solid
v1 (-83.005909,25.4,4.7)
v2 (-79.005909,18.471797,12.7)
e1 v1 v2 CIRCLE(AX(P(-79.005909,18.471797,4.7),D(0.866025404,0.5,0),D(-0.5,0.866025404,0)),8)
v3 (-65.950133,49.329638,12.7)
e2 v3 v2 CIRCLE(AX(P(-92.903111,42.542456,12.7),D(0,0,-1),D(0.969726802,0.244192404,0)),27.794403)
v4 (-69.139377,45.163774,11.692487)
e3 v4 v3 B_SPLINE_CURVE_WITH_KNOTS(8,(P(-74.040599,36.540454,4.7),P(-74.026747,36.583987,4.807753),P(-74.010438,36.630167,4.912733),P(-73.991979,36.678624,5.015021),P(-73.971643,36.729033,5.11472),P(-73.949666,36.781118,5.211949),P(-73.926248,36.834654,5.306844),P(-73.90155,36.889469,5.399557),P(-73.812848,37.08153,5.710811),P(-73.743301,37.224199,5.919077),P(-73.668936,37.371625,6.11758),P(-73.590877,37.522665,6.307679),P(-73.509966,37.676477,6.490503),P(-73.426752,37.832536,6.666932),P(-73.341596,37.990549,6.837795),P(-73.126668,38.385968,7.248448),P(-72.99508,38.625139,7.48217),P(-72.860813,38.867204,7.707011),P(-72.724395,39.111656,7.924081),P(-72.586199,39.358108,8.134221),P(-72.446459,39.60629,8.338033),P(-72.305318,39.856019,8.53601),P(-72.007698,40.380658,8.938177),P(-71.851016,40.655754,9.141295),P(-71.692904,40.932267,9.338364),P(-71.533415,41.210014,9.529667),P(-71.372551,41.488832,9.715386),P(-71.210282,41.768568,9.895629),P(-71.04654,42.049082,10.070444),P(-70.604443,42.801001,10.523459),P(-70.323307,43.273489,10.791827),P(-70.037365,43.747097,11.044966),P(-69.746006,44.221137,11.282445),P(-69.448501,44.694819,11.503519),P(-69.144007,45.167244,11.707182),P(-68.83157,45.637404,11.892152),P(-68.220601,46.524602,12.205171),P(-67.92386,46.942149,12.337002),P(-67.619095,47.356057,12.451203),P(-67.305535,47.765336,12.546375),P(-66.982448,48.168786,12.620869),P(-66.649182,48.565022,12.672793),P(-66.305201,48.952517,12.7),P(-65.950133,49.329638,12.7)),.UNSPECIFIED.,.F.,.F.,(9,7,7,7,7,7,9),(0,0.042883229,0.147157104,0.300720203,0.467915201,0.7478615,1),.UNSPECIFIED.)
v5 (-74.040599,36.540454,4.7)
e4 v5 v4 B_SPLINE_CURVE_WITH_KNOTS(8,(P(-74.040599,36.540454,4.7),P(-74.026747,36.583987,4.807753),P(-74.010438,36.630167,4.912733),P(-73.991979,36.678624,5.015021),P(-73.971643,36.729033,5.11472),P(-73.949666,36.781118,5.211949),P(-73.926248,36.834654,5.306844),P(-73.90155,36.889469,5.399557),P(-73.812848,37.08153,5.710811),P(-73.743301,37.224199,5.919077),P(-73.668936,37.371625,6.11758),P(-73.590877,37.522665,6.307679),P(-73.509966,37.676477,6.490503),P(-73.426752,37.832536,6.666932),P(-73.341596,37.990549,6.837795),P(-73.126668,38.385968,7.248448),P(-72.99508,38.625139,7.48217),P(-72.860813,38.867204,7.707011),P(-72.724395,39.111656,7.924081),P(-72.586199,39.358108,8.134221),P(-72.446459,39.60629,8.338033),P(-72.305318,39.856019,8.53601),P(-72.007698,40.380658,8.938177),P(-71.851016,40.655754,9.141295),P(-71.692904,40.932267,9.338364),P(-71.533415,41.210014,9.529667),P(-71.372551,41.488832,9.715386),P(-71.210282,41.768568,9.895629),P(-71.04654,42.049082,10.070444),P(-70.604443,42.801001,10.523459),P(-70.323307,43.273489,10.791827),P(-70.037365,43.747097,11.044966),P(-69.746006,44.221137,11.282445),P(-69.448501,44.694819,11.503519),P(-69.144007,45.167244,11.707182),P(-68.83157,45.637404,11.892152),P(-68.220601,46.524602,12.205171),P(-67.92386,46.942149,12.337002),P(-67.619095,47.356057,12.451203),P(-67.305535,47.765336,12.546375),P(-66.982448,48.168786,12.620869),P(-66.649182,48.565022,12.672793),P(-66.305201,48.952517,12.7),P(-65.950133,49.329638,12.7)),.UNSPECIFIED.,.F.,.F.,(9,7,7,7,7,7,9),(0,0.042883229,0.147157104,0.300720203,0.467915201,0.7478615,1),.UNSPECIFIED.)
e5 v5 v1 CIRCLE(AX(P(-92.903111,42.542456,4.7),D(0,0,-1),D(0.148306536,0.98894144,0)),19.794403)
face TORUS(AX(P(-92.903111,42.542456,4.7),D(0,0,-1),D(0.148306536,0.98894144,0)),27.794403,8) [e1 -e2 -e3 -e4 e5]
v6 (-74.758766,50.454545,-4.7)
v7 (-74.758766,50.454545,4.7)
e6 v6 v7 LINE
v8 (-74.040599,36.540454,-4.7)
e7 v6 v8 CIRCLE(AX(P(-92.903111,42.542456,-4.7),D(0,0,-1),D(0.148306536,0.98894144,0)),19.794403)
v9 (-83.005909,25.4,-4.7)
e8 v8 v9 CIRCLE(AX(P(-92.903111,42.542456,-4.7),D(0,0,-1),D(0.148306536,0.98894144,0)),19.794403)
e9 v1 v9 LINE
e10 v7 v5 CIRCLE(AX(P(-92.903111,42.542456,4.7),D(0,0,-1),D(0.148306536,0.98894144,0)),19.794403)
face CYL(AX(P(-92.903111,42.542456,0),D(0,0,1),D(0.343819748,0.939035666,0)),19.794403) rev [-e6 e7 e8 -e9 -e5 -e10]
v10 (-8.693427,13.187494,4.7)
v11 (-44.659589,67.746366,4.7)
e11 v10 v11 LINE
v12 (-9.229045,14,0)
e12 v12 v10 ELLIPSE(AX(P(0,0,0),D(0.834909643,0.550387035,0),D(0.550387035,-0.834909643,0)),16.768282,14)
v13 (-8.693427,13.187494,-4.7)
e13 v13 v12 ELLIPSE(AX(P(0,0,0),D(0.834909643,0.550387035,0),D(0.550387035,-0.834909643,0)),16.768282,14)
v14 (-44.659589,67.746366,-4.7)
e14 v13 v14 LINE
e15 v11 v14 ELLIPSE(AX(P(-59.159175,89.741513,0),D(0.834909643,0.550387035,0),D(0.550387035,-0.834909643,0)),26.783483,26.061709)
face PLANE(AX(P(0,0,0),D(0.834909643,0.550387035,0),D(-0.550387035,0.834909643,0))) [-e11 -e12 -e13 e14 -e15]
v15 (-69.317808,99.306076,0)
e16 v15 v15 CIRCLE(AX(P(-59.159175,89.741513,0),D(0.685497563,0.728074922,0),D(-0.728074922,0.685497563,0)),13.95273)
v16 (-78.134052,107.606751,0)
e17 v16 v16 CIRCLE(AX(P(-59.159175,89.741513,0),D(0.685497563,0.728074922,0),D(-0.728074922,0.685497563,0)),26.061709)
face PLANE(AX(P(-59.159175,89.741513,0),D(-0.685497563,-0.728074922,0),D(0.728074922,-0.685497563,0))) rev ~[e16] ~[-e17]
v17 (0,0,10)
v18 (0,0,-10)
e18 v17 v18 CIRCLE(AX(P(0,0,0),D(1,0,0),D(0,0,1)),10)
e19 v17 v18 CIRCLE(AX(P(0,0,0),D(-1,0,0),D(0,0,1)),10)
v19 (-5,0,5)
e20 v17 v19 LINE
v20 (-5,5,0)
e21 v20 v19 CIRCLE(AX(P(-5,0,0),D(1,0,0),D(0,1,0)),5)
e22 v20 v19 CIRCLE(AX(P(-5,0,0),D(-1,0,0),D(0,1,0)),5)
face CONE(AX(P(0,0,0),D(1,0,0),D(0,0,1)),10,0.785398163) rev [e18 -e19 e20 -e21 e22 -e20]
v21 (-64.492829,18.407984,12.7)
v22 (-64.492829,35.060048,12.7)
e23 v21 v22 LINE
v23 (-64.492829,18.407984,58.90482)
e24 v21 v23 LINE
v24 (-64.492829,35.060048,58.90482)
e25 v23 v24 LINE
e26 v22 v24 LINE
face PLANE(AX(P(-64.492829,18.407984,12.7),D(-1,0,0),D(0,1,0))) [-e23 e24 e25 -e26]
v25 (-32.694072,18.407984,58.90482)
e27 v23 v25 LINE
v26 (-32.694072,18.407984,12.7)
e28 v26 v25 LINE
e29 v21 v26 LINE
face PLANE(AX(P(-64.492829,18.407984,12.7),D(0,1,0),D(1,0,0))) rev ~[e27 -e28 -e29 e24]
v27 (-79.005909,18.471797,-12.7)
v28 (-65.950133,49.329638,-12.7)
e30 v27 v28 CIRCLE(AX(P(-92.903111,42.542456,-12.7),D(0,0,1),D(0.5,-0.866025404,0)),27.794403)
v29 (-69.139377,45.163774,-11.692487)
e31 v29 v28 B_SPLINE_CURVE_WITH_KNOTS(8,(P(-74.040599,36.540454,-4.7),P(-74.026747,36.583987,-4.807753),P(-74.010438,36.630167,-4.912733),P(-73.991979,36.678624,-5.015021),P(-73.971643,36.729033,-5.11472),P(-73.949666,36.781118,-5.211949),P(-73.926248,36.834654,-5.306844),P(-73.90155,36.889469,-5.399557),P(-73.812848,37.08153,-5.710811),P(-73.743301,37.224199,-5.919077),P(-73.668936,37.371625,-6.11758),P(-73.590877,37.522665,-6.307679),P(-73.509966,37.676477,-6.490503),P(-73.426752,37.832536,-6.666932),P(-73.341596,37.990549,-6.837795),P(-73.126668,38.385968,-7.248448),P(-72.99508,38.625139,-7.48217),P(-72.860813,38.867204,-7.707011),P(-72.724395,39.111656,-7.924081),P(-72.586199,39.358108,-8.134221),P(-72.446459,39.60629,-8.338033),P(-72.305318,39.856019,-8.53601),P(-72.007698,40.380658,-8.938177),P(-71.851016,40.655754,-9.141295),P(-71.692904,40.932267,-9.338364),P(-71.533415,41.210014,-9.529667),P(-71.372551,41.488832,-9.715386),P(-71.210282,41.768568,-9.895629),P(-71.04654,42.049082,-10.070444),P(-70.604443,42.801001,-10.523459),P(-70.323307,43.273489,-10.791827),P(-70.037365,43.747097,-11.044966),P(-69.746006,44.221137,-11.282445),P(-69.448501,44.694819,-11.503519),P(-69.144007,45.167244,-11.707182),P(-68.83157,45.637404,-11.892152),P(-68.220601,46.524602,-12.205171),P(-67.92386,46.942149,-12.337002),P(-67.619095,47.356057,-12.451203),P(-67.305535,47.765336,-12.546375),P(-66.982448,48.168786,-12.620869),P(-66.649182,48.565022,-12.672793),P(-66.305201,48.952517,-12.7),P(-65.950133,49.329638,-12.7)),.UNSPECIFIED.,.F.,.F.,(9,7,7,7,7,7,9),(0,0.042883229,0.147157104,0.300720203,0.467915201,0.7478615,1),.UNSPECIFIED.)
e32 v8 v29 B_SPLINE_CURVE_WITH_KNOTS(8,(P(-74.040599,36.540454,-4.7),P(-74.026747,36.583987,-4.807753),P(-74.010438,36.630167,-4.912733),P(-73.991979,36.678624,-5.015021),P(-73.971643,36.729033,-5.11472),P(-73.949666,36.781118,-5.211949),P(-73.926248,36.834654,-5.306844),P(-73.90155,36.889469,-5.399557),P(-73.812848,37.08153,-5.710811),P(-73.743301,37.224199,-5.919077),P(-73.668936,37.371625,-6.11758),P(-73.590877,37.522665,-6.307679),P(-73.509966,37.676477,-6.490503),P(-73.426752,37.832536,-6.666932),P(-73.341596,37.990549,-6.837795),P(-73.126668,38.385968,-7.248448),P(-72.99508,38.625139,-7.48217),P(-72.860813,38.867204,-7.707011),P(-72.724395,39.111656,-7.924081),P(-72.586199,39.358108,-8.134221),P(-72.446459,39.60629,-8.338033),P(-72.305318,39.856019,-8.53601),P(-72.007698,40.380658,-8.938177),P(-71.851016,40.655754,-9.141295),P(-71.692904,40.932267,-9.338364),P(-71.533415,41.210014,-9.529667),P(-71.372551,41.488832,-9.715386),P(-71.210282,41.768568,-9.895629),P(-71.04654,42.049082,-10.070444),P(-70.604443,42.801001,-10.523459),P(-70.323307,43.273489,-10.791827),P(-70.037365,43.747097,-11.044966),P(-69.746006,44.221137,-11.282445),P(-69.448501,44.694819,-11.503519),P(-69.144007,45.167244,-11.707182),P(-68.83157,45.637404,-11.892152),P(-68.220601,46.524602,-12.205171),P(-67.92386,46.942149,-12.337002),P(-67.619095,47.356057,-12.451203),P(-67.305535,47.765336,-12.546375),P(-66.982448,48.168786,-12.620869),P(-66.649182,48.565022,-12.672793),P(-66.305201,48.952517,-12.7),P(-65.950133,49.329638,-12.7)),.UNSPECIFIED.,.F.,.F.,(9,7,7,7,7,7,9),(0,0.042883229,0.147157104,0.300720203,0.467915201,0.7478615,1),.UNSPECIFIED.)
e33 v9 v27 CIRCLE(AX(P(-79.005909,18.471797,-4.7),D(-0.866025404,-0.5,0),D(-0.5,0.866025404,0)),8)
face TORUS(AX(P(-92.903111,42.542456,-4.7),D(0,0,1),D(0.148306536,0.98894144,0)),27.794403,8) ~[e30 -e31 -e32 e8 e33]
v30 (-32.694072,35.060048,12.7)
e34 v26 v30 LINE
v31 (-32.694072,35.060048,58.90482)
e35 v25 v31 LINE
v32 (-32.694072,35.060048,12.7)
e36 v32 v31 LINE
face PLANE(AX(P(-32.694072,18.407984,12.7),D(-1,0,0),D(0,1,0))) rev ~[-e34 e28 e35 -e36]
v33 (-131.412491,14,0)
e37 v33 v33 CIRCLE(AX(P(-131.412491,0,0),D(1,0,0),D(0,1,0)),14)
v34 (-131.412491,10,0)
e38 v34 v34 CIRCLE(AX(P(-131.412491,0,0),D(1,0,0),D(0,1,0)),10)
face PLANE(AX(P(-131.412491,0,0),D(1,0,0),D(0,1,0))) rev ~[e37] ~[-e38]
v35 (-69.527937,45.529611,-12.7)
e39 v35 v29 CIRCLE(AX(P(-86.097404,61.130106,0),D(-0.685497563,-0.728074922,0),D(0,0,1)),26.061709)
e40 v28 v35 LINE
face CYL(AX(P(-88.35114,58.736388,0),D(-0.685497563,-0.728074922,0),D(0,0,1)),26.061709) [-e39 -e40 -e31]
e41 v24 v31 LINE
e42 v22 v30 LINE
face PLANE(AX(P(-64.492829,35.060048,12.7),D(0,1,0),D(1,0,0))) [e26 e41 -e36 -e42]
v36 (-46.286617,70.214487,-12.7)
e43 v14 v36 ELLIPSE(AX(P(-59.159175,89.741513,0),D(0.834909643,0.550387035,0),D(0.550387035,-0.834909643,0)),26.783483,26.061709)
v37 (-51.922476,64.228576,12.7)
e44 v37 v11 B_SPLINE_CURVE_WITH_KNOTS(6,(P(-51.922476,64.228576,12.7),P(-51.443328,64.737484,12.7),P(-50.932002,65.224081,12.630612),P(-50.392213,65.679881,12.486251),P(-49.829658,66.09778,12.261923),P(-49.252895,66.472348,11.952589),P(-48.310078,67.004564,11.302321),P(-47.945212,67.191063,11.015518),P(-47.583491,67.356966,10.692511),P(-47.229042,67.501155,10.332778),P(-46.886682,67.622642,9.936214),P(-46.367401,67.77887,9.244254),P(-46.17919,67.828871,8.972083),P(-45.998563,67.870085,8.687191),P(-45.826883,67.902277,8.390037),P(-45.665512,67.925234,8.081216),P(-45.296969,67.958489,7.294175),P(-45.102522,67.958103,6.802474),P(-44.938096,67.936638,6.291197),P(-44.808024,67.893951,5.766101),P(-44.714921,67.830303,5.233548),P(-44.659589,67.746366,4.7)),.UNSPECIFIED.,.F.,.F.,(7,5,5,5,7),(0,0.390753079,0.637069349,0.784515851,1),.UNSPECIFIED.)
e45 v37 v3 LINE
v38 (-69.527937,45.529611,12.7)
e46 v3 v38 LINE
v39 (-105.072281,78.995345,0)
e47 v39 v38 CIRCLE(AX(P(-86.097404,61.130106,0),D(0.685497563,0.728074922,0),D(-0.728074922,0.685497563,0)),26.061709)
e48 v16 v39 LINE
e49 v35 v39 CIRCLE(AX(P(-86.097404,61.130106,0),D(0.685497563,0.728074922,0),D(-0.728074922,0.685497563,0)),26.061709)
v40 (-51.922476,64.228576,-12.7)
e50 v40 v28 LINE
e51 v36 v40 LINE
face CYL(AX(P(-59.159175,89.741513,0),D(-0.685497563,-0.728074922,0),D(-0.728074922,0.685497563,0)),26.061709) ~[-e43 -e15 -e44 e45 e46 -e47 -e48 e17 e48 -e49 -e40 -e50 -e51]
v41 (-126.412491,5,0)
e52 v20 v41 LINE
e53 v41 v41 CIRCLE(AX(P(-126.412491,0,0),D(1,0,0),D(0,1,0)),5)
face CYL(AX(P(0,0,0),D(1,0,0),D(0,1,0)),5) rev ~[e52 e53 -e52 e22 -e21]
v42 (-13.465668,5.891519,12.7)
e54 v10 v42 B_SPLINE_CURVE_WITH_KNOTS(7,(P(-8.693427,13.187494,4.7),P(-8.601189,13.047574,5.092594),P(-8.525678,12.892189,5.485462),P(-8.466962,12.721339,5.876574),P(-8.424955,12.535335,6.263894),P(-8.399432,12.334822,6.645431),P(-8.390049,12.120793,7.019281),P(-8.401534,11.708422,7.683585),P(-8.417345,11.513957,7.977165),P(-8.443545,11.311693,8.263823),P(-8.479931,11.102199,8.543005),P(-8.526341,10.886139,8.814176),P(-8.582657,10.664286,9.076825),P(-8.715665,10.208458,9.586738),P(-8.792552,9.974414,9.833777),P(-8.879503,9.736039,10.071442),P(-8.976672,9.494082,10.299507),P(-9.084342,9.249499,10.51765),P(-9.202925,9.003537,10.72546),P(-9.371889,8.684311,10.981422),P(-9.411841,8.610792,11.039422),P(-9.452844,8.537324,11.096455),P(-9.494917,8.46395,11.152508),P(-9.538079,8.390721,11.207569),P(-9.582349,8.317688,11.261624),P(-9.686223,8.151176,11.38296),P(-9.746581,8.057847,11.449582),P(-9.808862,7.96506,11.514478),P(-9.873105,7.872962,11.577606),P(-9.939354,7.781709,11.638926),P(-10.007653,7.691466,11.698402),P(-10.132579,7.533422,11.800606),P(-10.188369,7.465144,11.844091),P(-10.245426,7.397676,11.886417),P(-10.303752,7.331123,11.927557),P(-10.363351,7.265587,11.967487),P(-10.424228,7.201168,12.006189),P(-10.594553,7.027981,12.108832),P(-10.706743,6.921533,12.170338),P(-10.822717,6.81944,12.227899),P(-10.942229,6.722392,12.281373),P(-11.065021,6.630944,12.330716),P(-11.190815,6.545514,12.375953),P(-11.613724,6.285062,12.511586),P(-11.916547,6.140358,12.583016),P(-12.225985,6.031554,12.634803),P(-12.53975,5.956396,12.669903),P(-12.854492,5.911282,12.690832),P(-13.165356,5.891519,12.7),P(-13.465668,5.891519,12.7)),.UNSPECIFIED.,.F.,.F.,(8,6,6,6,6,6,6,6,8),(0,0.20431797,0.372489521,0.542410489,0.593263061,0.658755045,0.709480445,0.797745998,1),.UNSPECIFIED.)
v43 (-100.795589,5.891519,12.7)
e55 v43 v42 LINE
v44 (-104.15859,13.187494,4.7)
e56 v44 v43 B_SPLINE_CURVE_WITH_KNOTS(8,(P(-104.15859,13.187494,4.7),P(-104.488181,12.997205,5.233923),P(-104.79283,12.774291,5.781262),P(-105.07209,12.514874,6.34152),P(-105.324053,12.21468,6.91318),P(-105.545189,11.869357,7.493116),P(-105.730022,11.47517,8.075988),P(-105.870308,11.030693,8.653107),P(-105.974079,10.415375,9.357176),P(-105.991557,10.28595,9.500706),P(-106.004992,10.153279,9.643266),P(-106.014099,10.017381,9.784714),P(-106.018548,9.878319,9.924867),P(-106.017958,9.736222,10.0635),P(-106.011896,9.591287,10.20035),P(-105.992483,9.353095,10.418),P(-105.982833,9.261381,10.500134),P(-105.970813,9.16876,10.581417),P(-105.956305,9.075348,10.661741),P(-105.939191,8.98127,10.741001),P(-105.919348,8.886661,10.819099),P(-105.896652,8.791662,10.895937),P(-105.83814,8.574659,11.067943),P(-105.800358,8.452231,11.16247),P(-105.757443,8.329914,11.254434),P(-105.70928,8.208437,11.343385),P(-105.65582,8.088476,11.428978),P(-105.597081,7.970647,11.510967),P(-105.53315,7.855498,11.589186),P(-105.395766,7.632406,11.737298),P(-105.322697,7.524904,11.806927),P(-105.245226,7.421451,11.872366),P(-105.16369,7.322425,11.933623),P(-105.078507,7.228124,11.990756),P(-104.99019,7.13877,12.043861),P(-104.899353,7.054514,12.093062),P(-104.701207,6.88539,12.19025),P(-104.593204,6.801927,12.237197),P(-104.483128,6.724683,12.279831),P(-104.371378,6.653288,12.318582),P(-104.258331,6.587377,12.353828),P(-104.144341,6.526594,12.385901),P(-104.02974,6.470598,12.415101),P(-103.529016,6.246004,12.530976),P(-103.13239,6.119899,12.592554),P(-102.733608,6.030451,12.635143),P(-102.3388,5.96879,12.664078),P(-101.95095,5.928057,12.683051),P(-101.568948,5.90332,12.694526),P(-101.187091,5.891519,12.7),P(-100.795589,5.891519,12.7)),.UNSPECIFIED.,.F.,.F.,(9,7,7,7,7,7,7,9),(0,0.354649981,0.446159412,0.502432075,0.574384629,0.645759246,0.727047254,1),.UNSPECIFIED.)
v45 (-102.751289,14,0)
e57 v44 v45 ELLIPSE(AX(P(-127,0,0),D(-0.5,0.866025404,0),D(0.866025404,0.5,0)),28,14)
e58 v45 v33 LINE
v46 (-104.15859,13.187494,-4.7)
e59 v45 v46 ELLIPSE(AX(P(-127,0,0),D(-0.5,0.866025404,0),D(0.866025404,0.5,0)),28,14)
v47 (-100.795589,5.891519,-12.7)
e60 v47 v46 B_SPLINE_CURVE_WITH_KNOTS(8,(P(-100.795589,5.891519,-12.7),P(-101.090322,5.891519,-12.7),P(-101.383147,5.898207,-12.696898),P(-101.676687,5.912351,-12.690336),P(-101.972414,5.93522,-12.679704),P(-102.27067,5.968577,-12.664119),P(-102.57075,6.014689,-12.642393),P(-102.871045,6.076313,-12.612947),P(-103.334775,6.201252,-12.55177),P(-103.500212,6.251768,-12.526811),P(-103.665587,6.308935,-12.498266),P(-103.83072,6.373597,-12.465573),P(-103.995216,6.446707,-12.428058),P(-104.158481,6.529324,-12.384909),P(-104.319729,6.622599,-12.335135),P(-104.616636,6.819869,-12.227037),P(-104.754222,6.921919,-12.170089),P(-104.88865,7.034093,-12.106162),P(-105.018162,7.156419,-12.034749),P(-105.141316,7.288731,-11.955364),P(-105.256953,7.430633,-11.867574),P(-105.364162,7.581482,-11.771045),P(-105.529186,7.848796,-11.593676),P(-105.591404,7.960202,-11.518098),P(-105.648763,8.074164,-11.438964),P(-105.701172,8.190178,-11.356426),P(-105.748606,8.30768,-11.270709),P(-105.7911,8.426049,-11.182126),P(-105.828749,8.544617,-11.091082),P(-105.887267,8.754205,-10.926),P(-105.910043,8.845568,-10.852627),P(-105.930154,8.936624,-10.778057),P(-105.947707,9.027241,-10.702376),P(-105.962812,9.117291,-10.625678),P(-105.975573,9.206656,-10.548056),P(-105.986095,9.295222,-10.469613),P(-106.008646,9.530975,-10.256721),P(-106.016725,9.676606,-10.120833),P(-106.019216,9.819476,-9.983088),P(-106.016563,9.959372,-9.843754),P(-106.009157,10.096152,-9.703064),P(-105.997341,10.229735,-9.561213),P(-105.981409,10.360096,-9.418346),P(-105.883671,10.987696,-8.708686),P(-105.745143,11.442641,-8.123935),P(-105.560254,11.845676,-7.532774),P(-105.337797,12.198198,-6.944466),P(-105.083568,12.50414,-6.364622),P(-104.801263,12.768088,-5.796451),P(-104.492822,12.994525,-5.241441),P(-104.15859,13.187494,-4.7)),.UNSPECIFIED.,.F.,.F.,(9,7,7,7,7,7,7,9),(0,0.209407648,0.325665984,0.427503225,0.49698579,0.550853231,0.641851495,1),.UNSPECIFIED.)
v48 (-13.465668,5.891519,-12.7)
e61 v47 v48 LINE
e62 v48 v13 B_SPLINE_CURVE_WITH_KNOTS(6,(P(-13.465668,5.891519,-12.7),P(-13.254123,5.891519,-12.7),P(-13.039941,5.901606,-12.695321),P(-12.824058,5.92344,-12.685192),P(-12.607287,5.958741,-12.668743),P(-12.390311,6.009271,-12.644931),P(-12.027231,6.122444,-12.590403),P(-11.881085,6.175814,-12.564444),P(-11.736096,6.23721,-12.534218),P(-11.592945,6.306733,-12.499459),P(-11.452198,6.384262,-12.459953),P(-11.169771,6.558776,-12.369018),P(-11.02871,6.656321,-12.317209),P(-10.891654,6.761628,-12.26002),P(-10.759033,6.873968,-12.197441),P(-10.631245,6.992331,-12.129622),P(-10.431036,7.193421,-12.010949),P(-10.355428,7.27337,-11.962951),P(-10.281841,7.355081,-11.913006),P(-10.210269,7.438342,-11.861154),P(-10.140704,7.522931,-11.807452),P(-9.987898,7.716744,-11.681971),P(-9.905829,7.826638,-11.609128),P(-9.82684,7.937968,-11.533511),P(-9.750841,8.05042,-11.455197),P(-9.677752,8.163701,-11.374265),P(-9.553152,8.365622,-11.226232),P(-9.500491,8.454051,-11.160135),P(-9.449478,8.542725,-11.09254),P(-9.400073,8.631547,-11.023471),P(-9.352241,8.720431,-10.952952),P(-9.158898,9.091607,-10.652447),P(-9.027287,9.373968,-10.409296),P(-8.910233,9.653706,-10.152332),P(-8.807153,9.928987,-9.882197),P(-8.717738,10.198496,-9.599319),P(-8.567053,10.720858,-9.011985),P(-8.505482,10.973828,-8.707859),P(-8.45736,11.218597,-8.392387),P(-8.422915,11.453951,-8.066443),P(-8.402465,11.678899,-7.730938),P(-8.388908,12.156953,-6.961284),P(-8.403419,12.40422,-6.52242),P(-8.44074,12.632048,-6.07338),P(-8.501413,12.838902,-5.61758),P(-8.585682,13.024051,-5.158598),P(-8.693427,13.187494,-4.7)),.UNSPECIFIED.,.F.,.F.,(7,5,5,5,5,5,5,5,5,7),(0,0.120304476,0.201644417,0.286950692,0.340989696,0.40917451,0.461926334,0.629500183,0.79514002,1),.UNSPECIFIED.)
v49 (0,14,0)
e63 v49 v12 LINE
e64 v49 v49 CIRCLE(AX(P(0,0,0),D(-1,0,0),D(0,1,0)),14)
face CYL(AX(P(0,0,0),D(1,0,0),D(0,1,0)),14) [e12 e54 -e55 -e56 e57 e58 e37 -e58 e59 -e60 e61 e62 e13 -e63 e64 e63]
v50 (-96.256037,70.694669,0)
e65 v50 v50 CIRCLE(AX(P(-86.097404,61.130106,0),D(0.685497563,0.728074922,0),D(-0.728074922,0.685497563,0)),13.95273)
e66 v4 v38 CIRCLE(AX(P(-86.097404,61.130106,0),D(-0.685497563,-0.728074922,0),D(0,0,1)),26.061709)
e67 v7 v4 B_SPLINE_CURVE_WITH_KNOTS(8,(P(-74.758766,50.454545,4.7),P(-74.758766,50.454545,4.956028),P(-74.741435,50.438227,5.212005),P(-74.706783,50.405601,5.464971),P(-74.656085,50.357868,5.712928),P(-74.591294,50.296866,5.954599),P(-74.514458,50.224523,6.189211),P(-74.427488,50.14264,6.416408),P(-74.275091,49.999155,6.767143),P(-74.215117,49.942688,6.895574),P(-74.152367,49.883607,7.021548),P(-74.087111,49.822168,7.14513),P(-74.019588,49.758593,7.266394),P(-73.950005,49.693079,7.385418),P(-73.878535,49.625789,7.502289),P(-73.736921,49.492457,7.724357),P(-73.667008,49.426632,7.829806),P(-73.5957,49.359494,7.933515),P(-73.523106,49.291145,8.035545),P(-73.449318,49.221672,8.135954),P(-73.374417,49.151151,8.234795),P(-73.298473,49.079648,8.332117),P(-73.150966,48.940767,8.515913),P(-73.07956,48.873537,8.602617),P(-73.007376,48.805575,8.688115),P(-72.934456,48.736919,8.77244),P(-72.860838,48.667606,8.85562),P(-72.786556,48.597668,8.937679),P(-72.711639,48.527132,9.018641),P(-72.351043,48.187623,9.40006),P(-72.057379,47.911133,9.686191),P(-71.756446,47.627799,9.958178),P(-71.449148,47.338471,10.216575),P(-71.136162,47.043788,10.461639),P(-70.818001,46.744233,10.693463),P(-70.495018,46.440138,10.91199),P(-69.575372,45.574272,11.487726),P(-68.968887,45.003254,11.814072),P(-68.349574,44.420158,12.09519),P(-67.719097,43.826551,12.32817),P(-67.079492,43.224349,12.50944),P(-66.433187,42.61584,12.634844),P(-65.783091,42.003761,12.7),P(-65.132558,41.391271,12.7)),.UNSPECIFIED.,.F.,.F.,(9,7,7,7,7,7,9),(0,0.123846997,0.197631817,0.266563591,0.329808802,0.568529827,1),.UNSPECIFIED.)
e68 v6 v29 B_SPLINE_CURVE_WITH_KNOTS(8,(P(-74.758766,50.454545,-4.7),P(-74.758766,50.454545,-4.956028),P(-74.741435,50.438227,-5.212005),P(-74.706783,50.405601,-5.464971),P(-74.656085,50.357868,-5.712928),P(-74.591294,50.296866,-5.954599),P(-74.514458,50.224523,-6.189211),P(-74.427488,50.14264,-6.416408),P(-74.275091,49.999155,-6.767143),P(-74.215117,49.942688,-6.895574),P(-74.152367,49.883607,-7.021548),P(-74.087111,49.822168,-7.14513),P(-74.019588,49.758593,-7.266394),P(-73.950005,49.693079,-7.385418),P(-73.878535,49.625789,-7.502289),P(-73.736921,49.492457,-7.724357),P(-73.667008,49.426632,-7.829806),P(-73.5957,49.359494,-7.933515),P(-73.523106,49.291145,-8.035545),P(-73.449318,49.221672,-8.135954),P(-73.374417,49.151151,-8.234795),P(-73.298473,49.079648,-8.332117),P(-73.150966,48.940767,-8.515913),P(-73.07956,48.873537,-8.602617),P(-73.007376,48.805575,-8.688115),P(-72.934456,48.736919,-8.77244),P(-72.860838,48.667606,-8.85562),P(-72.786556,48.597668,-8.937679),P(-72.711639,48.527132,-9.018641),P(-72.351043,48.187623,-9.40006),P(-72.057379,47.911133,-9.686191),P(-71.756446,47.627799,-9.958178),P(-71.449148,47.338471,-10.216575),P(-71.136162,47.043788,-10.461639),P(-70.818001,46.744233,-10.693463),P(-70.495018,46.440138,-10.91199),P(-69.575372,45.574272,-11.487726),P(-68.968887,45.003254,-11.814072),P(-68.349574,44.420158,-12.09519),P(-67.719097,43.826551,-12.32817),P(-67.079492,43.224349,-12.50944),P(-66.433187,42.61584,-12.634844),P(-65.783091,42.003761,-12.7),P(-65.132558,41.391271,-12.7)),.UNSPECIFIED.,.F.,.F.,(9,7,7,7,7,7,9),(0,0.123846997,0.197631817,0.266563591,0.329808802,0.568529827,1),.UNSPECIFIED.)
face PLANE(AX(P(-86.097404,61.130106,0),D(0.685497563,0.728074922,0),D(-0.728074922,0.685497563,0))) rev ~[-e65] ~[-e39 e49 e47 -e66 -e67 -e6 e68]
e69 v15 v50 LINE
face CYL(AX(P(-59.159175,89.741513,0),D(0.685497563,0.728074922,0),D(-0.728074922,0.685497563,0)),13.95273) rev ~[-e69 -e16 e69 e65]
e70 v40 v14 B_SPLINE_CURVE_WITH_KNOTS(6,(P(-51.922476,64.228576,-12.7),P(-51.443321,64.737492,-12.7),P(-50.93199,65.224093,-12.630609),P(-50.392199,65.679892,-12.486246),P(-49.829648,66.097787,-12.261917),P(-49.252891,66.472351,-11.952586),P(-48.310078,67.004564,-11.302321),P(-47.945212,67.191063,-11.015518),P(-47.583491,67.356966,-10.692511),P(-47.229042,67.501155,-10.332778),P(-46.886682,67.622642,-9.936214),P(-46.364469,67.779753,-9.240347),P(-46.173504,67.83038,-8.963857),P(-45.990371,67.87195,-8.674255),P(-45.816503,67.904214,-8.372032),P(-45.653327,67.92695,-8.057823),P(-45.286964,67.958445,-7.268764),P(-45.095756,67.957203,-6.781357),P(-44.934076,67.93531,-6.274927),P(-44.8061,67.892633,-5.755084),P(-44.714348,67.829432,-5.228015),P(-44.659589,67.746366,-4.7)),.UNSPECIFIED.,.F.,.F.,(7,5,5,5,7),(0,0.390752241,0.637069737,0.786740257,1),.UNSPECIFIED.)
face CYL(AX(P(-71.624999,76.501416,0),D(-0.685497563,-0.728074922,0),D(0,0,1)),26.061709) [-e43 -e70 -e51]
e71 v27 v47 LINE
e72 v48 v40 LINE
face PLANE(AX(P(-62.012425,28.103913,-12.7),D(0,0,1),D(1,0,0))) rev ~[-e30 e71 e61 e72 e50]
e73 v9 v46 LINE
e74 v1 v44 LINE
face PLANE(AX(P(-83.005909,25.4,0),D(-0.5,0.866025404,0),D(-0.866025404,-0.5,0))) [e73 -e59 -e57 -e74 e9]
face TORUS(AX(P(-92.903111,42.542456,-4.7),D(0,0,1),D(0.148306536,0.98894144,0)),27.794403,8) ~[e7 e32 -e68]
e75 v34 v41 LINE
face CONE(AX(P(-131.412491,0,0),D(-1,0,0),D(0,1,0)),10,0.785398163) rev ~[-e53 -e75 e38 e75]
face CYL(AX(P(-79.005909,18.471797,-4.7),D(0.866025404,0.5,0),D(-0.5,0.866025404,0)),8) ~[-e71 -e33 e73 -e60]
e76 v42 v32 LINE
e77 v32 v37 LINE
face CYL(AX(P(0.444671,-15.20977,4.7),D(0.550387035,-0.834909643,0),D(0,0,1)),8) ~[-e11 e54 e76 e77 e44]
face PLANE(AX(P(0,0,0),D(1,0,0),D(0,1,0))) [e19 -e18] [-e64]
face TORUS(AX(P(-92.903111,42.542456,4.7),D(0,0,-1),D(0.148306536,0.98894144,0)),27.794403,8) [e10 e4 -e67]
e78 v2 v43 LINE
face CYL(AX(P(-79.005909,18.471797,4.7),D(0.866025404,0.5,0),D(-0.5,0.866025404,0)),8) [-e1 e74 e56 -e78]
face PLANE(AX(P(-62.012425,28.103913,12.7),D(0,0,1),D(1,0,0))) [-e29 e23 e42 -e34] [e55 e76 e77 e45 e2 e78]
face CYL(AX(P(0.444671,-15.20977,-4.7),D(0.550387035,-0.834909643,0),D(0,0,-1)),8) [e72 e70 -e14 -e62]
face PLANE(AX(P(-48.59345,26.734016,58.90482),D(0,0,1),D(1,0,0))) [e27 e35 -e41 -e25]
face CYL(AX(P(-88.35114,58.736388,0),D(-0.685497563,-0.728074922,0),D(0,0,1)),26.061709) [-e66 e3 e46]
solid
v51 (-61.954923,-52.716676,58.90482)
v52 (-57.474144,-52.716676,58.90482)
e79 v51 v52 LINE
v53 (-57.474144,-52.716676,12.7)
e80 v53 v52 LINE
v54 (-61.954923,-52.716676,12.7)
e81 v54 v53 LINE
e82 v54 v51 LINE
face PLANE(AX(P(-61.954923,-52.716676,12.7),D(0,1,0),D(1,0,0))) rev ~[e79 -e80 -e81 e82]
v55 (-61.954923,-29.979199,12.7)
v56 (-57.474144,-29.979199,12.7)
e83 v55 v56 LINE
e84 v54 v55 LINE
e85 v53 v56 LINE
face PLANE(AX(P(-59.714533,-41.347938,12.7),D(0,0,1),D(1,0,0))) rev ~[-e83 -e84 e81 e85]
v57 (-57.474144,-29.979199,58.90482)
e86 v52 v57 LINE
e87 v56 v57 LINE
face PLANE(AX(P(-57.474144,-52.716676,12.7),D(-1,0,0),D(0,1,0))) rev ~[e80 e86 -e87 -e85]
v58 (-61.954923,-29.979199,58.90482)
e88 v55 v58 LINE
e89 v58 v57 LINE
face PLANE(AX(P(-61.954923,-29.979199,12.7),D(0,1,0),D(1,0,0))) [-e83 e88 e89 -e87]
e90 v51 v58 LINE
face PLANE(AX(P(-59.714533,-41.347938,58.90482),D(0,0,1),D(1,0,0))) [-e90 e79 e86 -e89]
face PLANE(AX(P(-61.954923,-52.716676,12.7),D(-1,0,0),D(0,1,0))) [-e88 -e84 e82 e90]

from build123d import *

# Parameters (mm, degrees)
F1_DEPTH      = 12.7
F3_R          = 13.9527302744
F4_DEPTH      = 39.2973385505
F5_R          = 14
F6_DEPTH      = 131.4124912024
F7_R          = 5
F8_DEPTH      = 131.4134912024
F9_T2_ANGLE   = 90
F9_T4_ANGLE   = 90
F9_T6_ANGLE   = 180
F10_T4_DEPTH  = 117.0418308162
F10_S5_R      = 14
F10_T6_DEPTH  = 64
F10_S7_R      = 26.0617093966
F10_T8_DEPTH  = 64
F10_T12_ANGLE = 141.4711994172
F10_S13_R     = 26.0617093966
F10_T14_DEPTH = 40
F10_T18_ANGLE = 141.4711994172
F10_T23_DEPTH = 117.0418308162
F10_S24_R     = 14
F10_T25_DEPTH = 64
F10_S26_R     = 26.0617093966
F10_T27_DEPTH = 64
F10_T31_ANGLE = 141.4711994172
F10_S32_R     = 26.0617093966
F10_T33_DEPTH = 40
F10_T37_ANGLE = 141.4711994172
F10_T42_DEPTH = 99.0169613427
F10_S43_R     = 14
F10_T44_DEPTH = 55
F10_T48_DEPTH = 99.0169613427
F10_S49_R     = 14
F10_T50_DEPTH = 55
F11_W         = 31.7987574321
F11_H         = 16.6520640796
F12_DEPTH     = 46.2048202753
F11_W_2       = 4.480779171
F11_H_2       = 22.7374769747


# Not quite as in the source:
# - a fillet or chamfer that OpenCascade refuses, or shapes differently, is made with other operations: its cross-section is extruded or revolved along the edge and cut away or added


with BuildPart() as f1:
    # F0 (on Top) → F1 (new body, symmetric)
    with BuildSketch(Plane.XY):
        with BuildLine():
            Line((-127, 0), (0, 0))
            Line((0, 0), (-59.1591745615, 89.741513133))
            Line((-59.1591745615, 89.741513133), (-86.0974043608, 61.1301064491))
            ThreePointArc((-86.0974043608, 61.1301064491), (-73.1823881205, 44.2487624745), (-83.0059094878, 25.4))
            Line((-83.0059094878, 25.4), (-127, 0))
        make_face()
    extrude(amount=F1_DEPTH, both=True)

    # F0 (on Top) → F2 (revolve)
    with BuildSketch(Plane.XY):
        Polygon((-86.0974043608, 61.1301064491), (-59.1591745615, 89.741513133), (-78.134051587, 107.6067514057), (-105.0722813863, 78.9953447218), align=None)
    revolve(axis=Axis((-72.6282894611, 75.4358097911, 0), (0.6854975628, 0.7280749216, 0)))

    # F3 (on face) → F4 (cut, through all)
    with BuildSketch(Plane(origin=(16.9901086158, 18.0453916546, 0), x_dir=(-0.7280749216, 0.6854975628, 0), z_dir=(0.6854975628, 0.7280749216, 0))):
        with Locations((104.5898999113, 0)):
            Circle(F3_R)
    extrude(amount=-F4_DEPTH, mode=Mode.SUBTRACT)

    # F5 (on Right) → F6 (join)
    with BuildSketch(Plane.YZ):
        Circle(F5_R)
    extrude(amount=-F6_DEPTH)

    # F7 (on face) → F8 (cut, through all)
    with BuildSketch(Plane.YZ):
        Circle(F7_R)
    extrude(amount=-F8_DEPTH, mode=Mode.SUBTRACT)

    # F9: chamfer of 5 on 4 edges, made by hand

    # F9_s1 → F9_t2 (revolve, cut)
    with BuildSketch(Plane.XZ):
        Polygon((0, -10), (-5, -5), (0, -5), align=None)
    revolve(axis=Axis((0, 0, 0), (1, 0, 0)), revolution_arc=F9_T2_ANGLE, mode=Mode.SUBTRACT)

    # F9_s3 → F9_t4 (revolve, cut)
    with BuildSketch(Plane.XY):
        Polygon((0, 10), (-5, 5), (0, 5), align=None)
    revolve(axis=Axis((0, 0, 0), (1, 0, 0)), revolution_arc=F9_T4_ANGLE, mode=Mode.SUBTRACT)

    # F9_s5 → F9_t6 (revolve, cut)
    with BuildSketch(Plane.XZ):
        Polygon((0, 10), (-5, 5), (0, 5), align=None)
    revolve(axis=Axis((0, 0, 0), (1, 0, 0)), revolution_arc=F9_T6_ANGLE, mode=Mode.SUBTRACT)

    # F9_s7 → F9_t8 (revolve, cut)
    with BuildSketch(Plane.XY):
        Polygon((-131.4124912024, 10), (-126.4124912024, 5), (-131.4124912024, 5), align=None)
    revolve(axis=Axis((-131.4124912024, 0, 0), (1, 0, 0)), mode=Mode.SUBTRACT)

    # F10: fillet of radius 8 on 6 edges, made by hand


with BuildPart() as f10_tool2:
    # F10_s3 → F10_t4 (new body)
    with BuildSketch(Plane(origin=(7.123948143, -10.8066735308, 0), x_dir=(0, 0, 1), z_dir=(-0.5503870348, 0.834909643, 0))):
        with BuildLine():
            ThreePointArc((12.7, -8), (10.3568542495, -2.3431457505), (4.7, 0))
            Line((4.7, 0), (12.7, 0))
            Line((12.7, 0), (12.7, -8))
        make_face()
    extrude(amount=F10_T4_DEPTH)

    # F10_s5 → F10_t6 (cut, symmetric)
    with BuildSketch(Plane.YZ.offset(-28.4)):
        Circle(F10_S5_R)
    extrude(amount=F10_T6_DEPTH, both=True, mode=Mode.SUBTRACT)

    # F10_s7 → F10_t8 (cut, symmetric)
    with BuildSketch(Plane(origin=(4.5242839142, 4.8052944825, 0), x_dir=(0, 0, 1), z_dir=(-0.6854975628, -0.7280749216, 0))):
        with Locations((0, 104.5898999113)):
            Circle(F10_S7_R)
    extrude(amount=F10_T8_DEPTH, both=True, mode=Mode.SUBTRACT)


with BuildPart() as f1_1:
    add(f1.part)

    # F10_t1: cut F10_tool2
    add(f10_tool2.part, mode=Mode.SUBTRACT)


with BuildPart() as f10_tool10:
    # F10_s11 → F10_t12 (revolve)
    with BuildSketch(Plane(origin=(-97.0992752721, 14.5614862447, 0), x_dir=(0, 0, 1), z_dir=(-0.9889414398, 0.1483065361, 0))):
        with BuildLine():
            ThreePointArc((-4.7, 48.0882621603), (-10.3568542495, 50.4314079108), (-12.7, 56.0882621603))
            Line((-12.7, 56.0882621603), (-12.7, 48.0882621603))
            Line((-12.7, 48.0882621603), (-4.7, 48.0882621603))
        make_face()
    revolve(axis=Axis((-92.9031110442, 42.5424559485, -12.7), (0, 0, -1)), revolution_arc=F10_T12_ANGLE)

    # F10_s13 → F10_t14 (cut, symmetric)
    with BuildSketch(Plane(origin=(-12.2018566171, -12.9597336043, 0), x_dir=(0, 0, 1), z_dir=(-0.6854975628, -0.7280749216, 0))):
        with Locations((0, 104.5898999113)):
            Circle(F10_S13_R)
    extrude(amount=F10_T14_DEPTH, both=True, mode=Mode.SUBTRACT)


with BuildPart() as f1_2:
    add(f1_1.part)

    # F10_t9: cut F10_tool10
    add(f10_tool10.part, mode=Mode.SUBTRACT)


with BuildPart() as f10_tool16:
    # F10_s17 → F10_t18 (revolve)
    with BuildSketch(Plane(origin=(-97.0992752721, 14.5614862447, 0), x_dir=(0, 0, 1), z_dir=(-0.9889414398, 0.1483065361, 0))):
        with BuildLine():
            ThreePointArc((-4.7, 48.0882621603), (-10.3568542495, 50.4314079108), (-12.7, 56.0882621603))
            Line((-12.7, 56.0882621603), (-12.7, 48.0882621603))
            Line((-12.7, 48.0882621603), (-4.7, 48.0882621603))
        make_face()
    revolve(axis=Axis((-92.9031110442, 42.5424559485, -12.7), (0, 0, -1)), revolution_arc=F10_T18_ANGLE)

    split(bisect_by=Plane(origin=(-9.9481211835, -10.5660150293, 0), x_dir=(0, 0, 1), z_dir=(-0.6854975628, -0.7280749216, 0)), keep=Keep.TOP)


with BuildPart() as f1_3:
    add(f1_2.part)

    # F10_t15: cut F10_tool16
    add(f10_tool16.part, mode=Mode.SUBTRACT)


with BuildPart() as f10_tool21:
    # F10_s22 → F10_t23 (new body)
    with BuildSketch(Plane(origin=(7.123948143, -10.8066735308, 0), x_dir=(0, 0, 1), z_dir=(-0.5503870348, 0.834909643, 0))):
        with BuildLine():
            ThreePointArc((-12.7, -8), (-10.3568542495, -2.3431457505), (-4.7, 0))
            Line((-4.7, 0), (-12.7, 0))
            Line((-12.7, 0), (-12.7, -8))
        make_face()
    extrude(amount=F10_T23_DEPTH)

    # F10_s24 → F10_t25 (cut, symmetric)
    with BuildSketch(Plane.YZ.offset(-28.4)):
        Circle(F10_S24_R)
    extrude(amount=F10_T25_DEPTH, both=True, mode=Mode.SUBTRACT)

    # F10_s26 → F10_t27 (cut, symmetric)
    with BuildSketch(Plane(origin=(4.5242839142, 4.8052944825, 0), x_dir=(0, 0, 1), z_dir=(-0.6854975628, -0.7280749216, 0))):
        with Locations((0, 104.5898999113)):
            Circle(F10_S26_R)
    extrude(amount=F10_T27_DEPTH, both=True, mode=Mode.SUBTRACT)


with BuildPart() as f1_4:
    add(f1_3.part)

    # F10_t20: cut F10_tool21
    add(f10_tool21.part, mode=Mode.SUBTRACT)


with BuildPart() as f10_tool29:
    # F10_s30 → F10_t31 (revolve)
    with BuildSketch(Plane(origin=(-97.0992752721, 14.5614862447, 0), x_dir=(0, 0, 1), z_dir=(-0.9889414398, 0.1483065361, 0))):
        with BuildLine():
            ThreePointArc((4.7, 48.0882621603), (10.3568542495, 50.4314079108), (12.7, 56.0882621603))
            Line((12.7, 56.0882621603), (12.7, 48.0882621603))
            Line((12.7, 48.0882621603), (4.7, 48.0882621603))
        make_face()
    revolve(axis=Axis((-92.9031110442, 42.5424559485, 12.7), (0, 0, -1)), revolution_arc=F10_T31_ANGLE)

    # F10_s32 → F10_t33 (cut, symmetric)
    with BuildSketch(Plane(origin=(-12.2018566171, -12.9597336043, 0), x_dir=(0, 0, 1), z_dir=(-0.6854975628, -0.7280749216, 0))):
        with Locations((0, 104.5898999113)):
            Circle(F10_S32_R)
    extrude(amount=F10_T33_DEPTH, both=True, mode=Mode.SUBTRACT)


with BuildPart() as f1_5:
    add(f1_4.part)

    # F10_t28: cut F10_tool29
    add(f10_tool29.part, mode=Mode.SUBTRACT)


with BuildPart() as f10_tool35:
    # F10_s36 → F10_t37 (revolve)
    with BuildSketch(Plane(origin=(-97.0992752721, 14.5614862447, 0), x_dir=(0, 0, 1), z_dir=(-0.9889414398, 0.1483065361, 0))):
        with BuildLine():
            ThreePointArc((4.7, 48.0882621603), (10.3568542495, 50.4314079108), (12.7, 56.0882621603))
            Line((12.7, 56.0882621603), (12.7, 48.0882621603))
            Line((12.7, 48.0882621603), (4.7, 48.0882621603))
        make_face()
    revolve(axis=Axis((-92.9031110442, 42.5424559485, 12.7), (0, 0, -1)), revolution_arc=F10_T37_ANGLE)

    split(bisect_by=Plane(origin=(-9.9481211835, -10.5660150293, 0), x_dir=(0, 0, 1), z_dir=(-0.6854975628, -0.7280749216, 0)), keep=Keep.TOP)


with BuildPart() as f1_6:
    add(f1_5.part)

    # F10_t34: cut F10_tool35
    add(f10_tool35.part, mode=Mode.SUBTRACT)


with BuildPart() as f10_tool40:
    # F10_s41 → F10_t42 (new body)
    with BuildSketch(Plane(origin=(-51.2559094878, -29.5926131403, 0), x_dir=(0, 0, 1), z_dir=(-0.8660254038, -0.5, 0))):
        with BuildLine():
            ThreePointArc((4.7, 63.5), (10.3568542495, 61.1568542495), (12.7, 55.5))
            Line((12.7, 55.5), (12.7, 63.5))
            Line((12.7, 63.5), (4.7, 63.5))
        make_face()
    extrude(amount=F10_T42_DEPTH)

    # F10_s43 → F10_t44 (cut, symmetric)
    with BuildSketch(Plane.YZ.offset(-123.9)):
        Circle(F10_S43_R)
    extrude(amount=F10_T44_DEPTH, both=True, mode=Mode.SUBTRACT)


with BuildPart() as f1_7:
    add(f1_6.part)

    # F10_t39: cut F10_tool40
    add(f10_tool40.part, mode=Mode.SUBTRACT)


with BuildPart() as f10_tool46:
    # F10_s47 → F10_t48 (new body)
    with BuildSketch(Plane(origin=(-51.2559094878, -29.5926131403, 0), x_dir=(0, 0, 1), z_dir=(-0.8660254038, -0.5, 0))):
        with BuildLine():
            ThreePointArc((-4.7, 63.5), (-10.3568542495, 61.1568542495), (-12.7, 55.5))
            Line((-12.7, 55.5), (-12.7, 63.5))
            Line((-12.7, 63.5), (-4.7, 63.5))
        make_face()
    extrude(amount=F10_T48_DEPTH)

    # F10_s49 → F10_t50 (cut, symmetric)
    with BuildSketch(Plane.YZ.offset(-123.9)):
        Circle(F10_S49_R)
    extrude(amount=F10_T50_DEPTH, both=True, mode=Mode.SUBTRACT)


with BuildPart() as f1_8:
    add(f1_7.part)

    # F10_t45: cut F10_tool46
    add(f10_tool46.part, mode=Mode.SUBTRACT)

    # F11 (on face) → F12 (join)
    with BuildSketch(Plane.XY.offset(12.7)):
        with Locations((-48.593450428, 26.7340157452)):
            Rectangle(F11_W, F11_H)
    extrude(amount=F12_DEPTH)


with BuildPart() as f12:
    # F11 (on face) → F12, piece 2 (new body)
    with BuildSketch(Plane.XY.offset(12.7)):
        with Locations((-59.7145333886, -41.3479376584)):
            Rectangle(F11_W_2, F11_H_2)
    extrude(amount=F12_DEPTH)


solid = Compound([f1_8.part, f12.part])
